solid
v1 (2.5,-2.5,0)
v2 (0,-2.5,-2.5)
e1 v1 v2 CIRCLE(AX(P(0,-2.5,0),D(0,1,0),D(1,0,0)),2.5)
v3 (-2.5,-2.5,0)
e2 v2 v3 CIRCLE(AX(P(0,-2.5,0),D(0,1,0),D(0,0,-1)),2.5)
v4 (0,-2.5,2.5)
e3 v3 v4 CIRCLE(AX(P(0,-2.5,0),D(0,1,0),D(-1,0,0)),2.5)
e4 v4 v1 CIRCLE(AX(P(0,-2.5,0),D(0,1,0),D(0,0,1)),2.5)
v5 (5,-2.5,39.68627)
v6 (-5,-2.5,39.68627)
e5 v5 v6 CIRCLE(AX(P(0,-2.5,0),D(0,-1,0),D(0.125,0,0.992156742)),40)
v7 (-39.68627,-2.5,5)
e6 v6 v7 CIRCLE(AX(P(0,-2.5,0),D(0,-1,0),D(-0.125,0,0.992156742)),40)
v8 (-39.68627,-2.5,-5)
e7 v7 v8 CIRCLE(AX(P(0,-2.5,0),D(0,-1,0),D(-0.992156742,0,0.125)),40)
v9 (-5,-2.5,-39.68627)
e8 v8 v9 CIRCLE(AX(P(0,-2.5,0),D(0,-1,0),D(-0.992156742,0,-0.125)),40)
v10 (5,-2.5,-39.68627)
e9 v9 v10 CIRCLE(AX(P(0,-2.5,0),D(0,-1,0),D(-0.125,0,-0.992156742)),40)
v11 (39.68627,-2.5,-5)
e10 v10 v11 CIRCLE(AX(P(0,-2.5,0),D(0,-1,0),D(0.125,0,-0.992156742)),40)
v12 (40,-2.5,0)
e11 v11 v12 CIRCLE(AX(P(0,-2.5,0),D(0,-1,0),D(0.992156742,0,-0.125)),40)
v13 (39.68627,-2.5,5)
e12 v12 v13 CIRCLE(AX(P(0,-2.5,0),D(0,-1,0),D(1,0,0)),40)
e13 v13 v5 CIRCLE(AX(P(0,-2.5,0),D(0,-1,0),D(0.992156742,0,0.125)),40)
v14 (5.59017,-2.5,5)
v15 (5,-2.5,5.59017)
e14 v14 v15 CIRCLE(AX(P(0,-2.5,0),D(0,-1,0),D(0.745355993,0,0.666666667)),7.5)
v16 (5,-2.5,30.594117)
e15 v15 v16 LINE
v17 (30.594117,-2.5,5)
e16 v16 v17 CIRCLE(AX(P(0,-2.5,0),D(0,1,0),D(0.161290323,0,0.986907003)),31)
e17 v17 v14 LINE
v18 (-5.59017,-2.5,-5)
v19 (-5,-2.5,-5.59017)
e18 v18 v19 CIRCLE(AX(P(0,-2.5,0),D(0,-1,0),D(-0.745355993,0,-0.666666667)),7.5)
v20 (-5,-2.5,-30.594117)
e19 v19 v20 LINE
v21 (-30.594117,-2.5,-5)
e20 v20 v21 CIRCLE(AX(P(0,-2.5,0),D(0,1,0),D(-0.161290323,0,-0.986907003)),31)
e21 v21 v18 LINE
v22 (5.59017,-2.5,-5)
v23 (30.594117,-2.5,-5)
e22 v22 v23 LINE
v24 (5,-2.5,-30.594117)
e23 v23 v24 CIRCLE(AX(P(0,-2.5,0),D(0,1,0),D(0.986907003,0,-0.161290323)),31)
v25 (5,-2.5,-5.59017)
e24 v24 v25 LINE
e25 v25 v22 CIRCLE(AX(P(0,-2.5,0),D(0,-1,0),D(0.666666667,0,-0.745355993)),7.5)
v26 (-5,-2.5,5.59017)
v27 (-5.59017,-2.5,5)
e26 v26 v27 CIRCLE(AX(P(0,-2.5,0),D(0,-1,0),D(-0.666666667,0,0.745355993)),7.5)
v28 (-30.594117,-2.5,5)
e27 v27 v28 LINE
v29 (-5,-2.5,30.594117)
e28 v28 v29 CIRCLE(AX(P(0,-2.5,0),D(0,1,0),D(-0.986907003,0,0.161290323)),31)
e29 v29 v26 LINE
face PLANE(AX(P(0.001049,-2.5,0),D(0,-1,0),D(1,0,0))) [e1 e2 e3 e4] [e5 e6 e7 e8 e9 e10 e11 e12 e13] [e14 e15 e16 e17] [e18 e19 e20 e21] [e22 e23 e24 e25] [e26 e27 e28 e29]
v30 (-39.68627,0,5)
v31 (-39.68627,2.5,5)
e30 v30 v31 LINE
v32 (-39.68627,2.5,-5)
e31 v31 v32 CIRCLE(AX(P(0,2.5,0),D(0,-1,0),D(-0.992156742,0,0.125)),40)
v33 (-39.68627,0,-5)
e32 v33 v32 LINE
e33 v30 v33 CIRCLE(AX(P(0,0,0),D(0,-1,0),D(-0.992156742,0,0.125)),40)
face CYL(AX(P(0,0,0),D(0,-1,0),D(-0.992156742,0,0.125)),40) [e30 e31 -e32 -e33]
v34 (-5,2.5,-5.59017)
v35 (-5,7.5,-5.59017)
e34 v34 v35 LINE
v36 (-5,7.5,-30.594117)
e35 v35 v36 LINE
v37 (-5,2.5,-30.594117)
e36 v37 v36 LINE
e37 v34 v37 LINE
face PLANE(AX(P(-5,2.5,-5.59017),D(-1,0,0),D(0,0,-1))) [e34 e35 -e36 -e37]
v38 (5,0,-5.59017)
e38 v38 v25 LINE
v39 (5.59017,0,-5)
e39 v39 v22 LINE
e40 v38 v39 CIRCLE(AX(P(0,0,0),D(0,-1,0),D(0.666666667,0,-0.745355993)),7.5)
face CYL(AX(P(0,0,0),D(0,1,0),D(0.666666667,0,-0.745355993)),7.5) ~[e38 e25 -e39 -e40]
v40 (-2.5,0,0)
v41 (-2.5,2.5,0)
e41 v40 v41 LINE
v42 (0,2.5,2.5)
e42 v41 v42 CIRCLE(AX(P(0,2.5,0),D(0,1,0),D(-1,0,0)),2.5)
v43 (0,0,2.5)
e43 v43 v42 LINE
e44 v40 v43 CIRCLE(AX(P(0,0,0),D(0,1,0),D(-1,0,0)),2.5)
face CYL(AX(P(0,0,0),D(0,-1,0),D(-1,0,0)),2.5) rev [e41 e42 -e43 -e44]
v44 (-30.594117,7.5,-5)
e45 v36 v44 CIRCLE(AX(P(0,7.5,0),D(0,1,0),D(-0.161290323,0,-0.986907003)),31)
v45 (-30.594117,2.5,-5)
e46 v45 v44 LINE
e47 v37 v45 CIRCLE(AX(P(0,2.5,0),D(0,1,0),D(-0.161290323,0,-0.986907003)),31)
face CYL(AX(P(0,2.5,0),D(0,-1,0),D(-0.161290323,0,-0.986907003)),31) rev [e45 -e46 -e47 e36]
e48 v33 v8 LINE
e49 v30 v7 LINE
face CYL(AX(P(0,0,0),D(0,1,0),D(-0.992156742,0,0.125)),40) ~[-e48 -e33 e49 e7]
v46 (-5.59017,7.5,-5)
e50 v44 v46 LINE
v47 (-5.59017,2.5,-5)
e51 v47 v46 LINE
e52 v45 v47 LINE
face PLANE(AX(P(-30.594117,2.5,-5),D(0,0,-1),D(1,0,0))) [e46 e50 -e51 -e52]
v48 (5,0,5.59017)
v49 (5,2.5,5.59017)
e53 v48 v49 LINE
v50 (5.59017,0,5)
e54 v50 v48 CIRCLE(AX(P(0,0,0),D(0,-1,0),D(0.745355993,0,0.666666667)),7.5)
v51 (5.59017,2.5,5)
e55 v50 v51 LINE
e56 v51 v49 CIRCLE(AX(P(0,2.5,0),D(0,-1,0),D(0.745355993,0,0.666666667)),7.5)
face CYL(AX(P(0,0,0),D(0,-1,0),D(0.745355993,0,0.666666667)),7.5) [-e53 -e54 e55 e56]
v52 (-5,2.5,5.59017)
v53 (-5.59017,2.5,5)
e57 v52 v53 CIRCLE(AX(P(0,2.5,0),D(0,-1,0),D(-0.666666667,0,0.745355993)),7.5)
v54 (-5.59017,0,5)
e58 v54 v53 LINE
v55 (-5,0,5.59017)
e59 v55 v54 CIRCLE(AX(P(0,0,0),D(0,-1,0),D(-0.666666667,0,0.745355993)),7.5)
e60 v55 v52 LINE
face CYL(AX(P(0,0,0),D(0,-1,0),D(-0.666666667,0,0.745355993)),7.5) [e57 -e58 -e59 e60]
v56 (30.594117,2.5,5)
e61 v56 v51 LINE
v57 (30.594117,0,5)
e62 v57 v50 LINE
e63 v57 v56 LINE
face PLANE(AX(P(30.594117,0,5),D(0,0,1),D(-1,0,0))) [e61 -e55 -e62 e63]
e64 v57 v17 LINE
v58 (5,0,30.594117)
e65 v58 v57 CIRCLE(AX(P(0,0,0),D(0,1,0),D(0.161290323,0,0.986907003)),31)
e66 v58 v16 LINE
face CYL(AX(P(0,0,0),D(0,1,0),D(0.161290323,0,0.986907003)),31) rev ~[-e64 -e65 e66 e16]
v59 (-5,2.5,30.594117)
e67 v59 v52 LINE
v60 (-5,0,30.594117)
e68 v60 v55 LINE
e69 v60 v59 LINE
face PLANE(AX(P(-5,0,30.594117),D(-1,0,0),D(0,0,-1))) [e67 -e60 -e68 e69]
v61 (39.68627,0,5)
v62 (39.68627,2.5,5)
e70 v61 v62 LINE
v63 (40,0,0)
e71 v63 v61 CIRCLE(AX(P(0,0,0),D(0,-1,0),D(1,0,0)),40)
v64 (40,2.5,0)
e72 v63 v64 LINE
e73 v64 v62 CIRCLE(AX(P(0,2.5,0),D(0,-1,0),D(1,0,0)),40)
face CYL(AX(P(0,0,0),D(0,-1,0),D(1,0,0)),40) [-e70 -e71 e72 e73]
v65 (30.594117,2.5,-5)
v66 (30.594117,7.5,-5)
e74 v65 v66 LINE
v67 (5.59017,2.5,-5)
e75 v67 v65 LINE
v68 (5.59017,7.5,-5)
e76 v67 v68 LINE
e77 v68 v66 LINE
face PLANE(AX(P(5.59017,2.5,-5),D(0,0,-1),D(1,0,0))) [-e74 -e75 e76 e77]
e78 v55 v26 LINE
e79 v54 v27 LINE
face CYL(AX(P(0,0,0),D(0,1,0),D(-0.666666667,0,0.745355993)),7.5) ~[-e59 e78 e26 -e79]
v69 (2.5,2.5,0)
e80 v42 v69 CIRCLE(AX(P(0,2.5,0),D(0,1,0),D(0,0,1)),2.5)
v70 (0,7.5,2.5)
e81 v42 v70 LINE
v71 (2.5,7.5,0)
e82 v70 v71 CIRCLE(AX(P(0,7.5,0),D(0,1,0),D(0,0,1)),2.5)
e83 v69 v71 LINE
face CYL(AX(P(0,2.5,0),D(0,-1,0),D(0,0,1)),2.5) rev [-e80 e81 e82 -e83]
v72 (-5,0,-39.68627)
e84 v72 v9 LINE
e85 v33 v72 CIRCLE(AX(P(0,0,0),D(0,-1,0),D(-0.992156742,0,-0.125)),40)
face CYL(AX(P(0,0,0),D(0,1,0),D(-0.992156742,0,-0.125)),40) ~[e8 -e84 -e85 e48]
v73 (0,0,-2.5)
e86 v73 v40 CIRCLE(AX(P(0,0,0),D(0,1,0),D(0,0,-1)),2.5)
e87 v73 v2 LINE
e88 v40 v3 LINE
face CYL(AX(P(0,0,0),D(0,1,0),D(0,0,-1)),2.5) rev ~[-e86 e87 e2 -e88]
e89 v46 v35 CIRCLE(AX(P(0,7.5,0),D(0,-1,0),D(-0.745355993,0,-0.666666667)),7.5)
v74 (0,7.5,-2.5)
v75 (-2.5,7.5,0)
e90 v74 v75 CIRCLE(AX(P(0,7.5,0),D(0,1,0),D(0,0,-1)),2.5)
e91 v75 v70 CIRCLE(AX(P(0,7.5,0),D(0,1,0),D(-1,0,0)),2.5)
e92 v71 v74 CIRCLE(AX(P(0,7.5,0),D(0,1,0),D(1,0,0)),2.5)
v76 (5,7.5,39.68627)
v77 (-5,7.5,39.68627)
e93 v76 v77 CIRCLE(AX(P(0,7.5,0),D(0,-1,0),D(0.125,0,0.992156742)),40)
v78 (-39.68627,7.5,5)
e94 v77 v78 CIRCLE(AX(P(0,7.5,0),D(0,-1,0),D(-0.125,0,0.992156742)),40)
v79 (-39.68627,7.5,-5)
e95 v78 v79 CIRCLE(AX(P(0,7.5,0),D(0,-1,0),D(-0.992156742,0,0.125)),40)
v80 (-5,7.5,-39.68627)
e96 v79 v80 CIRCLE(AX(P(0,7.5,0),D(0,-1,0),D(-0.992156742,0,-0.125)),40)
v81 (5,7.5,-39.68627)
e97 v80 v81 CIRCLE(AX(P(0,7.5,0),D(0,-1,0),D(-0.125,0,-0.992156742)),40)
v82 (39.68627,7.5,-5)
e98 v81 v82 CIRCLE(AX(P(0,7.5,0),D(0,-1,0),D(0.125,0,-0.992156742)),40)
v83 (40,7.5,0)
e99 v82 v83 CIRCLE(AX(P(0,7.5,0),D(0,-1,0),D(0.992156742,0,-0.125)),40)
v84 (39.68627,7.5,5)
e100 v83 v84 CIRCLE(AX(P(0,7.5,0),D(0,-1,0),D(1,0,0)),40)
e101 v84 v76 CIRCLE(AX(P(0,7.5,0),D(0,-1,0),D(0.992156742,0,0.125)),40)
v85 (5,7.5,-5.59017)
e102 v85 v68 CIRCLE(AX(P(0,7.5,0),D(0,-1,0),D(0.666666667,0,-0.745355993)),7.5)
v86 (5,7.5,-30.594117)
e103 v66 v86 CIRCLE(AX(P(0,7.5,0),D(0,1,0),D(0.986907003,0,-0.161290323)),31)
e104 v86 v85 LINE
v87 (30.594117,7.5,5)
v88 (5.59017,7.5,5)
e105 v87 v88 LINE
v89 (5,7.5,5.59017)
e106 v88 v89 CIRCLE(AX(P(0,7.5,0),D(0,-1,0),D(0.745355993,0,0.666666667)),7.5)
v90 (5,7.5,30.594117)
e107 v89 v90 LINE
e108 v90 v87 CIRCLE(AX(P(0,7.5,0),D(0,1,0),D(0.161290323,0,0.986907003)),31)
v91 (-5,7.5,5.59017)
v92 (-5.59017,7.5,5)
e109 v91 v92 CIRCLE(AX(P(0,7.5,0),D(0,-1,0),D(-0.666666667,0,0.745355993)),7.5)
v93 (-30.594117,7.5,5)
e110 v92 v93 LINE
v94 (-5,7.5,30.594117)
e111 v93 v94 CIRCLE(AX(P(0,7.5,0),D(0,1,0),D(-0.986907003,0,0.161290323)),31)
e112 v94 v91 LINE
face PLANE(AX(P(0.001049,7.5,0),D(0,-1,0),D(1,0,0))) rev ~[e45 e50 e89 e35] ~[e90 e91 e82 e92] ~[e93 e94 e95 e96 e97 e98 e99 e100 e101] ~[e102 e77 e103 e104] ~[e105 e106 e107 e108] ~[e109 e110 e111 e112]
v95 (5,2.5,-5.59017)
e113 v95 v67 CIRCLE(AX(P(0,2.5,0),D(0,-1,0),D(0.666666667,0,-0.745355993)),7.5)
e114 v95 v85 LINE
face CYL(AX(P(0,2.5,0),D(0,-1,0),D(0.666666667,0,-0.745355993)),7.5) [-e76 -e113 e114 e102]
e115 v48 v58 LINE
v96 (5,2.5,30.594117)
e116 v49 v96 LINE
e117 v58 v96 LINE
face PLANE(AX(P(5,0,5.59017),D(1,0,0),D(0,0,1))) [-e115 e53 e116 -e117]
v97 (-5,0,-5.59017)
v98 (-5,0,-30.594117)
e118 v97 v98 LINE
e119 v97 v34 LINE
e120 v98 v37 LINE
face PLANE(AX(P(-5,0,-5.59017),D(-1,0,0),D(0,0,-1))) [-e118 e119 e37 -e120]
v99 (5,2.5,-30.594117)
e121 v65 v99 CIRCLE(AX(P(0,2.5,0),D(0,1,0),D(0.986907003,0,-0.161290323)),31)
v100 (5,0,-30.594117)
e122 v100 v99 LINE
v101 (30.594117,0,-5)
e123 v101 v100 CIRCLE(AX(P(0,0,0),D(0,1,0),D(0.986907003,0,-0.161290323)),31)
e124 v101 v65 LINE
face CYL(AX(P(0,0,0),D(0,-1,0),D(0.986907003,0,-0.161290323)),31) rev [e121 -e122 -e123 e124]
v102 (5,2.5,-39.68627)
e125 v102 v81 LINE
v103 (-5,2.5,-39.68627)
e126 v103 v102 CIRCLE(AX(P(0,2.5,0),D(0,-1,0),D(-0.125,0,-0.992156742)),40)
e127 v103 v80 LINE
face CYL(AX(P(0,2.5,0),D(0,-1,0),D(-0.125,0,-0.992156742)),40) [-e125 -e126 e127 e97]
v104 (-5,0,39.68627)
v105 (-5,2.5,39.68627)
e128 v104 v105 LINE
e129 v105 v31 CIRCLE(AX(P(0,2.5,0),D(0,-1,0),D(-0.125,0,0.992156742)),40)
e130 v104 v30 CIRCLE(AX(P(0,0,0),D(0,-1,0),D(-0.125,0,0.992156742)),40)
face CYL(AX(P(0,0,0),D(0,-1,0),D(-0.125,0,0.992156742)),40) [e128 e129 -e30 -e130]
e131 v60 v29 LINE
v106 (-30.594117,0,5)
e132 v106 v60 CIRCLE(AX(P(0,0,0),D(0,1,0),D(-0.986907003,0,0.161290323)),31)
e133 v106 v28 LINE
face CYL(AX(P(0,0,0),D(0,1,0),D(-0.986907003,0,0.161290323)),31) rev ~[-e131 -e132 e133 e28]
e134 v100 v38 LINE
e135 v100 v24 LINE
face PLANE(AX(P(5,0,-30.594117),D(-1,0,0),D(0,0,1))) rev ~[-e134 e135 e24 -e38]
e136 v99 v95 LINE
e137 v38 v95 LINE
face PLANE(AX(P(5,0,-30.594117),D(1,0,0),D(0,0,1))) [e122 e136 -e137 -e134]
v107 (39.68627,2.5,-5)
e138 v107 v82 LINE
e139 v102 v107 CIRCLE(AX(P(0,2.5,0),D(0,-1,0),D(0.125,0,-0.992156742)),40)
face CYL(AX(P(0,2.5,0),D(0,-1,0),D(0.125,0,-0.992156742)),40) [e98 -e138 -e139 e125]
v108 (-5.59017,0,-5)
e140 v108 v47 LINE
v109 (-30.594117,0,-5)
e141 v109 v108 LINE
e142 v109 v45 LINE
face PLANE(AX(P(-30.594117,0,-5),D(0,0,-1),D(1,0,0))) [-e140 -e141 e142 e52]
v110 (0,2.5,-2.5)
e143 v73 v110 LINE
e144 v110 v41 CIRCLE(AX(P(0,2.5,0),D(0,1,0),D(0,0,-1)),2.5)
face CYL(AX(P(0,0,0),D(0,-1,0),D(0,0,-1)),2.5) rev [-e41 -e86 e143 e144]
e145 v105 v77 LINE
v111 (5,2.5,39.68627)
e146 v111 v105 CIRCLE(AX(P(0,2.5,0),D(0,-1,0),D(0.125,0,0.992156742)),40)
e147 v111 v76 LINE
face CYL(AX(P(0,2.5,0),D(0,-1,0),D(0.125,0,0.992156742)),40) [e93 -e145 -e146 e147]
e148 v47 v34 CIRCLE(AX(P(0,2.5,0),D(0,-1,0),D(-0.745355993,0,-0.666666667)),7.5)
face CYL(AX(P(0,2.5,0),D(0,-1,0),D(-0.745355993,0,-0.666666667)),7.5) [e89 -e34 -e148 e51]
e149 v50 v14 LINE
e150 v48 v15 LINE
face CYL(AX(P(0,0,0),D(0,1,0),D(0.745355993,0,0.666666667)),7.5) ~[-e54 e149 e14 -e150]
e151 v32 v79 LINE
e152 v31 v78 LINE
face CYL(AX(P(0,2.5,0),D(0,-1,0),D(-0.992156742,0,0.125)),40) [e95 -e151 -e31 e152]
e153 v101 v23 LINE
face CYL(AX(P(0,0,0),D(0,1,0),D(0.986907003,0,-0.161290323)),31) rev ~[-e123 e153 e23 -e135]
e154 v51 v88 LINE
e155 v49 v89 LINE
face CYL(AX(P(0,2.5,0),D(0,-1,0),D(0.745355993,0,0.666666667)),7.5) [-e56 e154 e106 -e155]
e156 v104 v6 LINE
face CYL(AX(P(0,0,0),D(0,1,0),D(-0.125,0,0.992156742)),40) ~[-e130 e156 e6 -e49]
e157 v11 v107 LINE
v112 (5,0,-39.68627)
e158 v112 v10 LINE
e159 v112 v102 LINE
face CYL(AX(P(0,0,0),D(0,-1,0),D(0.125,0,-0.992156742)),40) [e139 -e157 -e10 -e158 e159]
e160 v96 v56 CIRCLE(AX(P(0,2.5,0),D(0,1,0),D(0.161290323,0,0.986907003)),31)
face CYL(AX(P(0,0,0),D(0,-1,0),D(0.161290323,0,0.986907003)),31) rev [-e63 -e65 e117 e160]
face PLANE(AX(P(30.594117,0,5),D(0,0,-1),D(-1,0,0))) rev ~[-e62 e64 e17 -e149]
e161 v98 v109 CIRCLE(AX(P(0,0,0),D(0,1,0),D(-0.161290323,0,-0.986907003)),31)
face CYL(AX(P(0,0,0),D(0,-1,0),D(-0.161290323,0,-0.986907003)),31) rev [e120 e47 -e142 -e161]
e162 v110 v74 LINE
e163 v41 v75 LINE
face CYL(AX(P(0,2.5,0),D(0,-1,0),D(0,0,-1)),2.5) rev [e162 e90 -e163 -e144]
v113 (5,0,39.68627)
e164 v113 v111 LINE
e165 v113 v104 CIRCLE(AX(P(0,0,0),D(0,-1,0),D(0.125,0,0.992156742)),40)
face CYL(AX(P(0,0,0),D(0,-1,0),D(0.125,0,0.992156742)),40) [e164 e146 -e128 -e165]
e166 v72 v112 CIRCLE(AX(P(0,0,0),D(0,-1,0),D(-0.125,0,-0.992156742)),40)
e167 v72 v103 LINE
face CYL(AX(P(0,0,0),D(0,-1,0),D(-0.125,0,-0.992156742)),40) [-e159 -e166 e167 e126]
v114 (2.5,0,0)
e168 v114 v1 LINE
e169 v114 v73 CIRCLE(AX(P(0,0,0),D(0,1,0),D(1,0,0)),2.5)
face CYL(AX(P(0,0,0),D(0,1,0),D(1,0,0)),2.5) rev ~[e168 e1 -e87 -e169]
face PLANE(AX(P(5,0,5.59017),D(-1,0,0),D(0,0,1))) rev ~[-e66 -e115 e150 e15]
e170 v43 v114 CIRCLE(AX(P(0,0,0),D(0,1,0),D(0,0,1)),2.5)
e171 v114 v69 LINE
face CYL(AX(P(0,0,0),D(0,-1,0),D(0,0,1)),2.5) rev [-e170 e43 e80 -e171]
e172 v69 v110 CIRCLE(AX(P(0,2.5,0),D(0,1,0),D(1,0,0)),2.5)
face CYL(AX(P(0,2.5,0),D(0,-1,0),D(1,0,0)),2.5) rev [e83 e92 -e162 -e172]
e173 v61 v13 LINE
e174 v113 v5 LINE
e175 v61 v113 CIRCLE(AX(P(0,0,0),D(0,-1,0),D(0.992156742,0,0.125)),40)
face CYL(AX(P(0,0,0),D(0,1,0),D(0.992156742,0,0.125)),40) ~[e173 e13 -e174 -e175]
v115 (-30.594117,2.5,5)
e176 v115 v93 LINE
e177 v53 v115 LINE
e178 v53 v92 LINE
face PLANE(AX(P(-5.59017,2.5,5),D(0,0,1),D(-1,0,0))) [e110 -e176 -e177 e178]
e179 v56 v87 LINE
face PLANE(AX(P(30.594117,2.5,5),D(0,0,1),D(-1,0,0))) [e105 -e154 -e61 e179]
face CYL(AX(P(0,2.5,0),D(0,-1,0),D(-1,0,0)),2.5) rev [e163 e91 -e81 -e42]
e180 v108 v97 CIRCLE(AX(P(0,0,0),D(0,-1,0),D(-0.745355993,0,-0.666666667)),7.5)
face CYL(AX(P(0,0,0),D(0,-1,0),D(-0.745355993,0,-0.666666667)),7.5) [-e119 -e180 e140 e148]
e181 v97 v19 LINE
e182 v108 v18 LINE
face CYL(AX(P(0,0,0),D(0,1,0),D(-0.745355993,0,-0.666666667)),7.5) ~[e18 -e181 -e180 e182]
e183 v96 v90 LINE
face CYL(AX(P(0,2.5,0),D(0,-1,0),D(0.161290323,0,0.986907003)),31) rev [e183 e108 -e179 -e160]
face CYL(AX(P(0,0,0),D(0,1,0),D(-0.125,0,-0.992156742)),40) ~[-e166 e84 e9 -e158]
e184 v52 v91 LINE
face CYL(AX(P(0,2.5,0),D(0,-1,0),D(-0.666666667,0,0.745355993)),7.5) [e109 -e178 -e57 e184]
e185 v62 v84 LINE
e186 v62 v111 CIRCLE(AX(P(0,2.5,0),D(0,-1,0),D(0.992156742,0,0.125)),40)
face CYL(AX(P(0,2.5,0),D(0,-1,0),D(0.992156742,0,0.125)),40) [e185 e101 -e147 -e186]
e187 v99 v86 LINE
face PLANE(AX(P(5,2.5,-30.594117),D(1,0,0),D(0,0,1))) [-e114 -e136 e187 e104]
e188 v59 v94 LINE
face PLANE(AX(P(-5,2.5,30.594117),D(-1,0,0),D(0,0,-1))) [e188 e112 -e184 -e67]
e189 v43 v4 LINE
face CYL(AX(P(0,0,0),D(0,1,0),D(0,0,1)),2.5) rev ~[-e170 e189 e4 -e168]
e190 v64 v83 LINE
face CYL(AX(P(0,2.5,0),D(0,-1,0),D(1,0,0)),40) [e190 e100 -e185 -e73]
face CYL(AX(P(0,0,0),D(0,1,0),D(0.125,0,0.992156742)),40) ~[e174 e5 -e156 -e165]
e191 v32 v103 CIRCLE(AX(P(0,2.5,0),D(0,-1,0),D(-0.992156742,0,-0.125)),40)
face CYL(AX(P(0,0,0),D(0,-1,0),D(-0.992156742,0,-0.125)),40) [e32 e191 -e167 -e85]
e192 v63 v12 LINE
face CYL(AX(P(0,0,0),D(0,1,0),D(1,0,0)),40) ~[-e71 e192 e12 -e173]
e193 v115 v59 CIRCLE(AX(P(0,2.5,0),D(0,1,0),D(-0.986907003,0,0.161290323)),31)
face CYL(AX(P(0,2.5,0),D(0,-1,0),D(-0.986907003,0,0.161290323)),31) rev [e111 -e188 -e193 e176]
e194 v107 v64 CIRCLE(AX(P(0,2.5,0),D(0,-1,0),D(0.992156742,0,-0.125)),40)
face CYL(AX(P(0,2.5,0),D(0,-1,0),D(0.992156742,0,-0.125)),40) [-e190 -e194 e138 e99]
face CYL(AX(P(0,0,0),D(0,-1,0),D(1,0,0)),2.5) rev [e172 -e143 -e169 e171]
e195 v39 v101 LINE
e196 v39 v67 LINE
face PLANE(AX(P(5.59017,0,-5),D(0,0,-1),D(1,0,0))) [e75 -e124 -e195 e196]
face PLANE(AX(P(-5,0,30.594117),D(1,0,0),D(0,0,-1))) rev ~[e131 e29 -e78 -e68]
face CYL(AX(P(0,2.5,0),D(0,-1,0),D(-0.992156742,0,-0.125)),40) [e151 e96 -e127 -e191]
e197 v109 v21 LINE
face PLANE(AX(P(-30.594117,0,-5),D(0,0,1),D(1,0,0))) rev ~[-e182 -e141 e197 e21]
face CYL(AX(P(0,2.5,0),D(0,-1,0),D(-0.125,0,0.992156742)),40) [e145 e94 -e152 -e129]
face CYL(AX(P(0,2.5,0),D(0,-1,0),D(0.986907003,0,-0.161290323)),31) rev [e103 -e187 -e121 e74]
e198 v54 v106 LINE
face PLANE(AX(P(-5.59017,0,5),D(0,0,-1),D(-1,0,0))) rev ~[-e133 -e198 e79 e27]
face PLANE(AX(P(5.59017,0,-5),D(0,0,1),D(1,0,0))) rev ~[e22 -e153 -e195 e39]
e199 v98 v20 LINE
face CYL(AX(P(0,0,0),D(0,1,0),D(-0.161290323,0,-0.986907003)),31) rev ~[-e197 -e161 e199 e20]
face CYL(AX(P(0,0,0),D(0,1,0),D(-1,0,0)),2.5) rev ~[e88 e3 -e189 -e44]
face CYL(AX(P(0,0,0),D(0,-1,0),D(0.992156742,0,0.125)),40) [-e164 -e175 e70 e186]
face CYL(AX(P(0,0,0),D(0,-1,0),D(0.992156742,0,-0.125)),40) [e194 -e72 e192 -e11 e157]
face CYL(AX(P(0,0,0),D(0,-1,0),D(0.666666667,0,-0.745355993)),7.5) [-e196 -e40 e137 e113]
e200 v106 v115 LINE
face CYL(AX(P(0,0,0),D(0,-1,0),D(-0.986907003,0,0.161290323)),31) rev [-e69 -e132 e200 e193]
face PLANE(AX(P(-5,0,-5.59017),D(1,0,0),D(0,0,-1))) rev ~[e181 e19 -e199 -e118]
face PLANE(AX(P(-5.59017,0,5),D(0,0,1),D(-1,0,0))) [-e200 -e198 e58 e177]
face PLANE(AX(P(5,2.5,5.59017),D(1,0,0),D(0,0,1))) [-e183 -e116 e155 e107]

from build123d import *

# Parameters (mm, degrees)
F1_DEPTH = 2.5
F2_DEPTH = 5


# Not quite as in the source:
# - a feature names something its author has since deleted; it is built from what else it names


with BuildPart() as f1:
    # F0 (on Front) → F1 (new body, symmetric)
    with BuildSketch(Plane.XZ):
        with BuildLine():
            ThreePointArc((39.686269666, -5), (39.9214903695, -2.5049165017), (40, 0))
            ThreePointArc((40, 0), (39.9214903695, 2.5049165017), (39.686269666, 5))
            ThreePointArc((39.686269666, 5), (28.2842712475, 28.2842712475), (5, 39.686269666))
            ThreePointArc((5, 39.686269666), (0, 40), (-5, 39.686269666))
            ThreePointArc((-5, 39.686269666), (-28.2842712475, 28.2842712475), (-39.686269666, 5))
            ThreePointArc((-39.686269666, 5), (-40, 0), (-39.686269666, -5))
            ThreePointArc((-39.686269666, -5), (-28.2842712475, -28.2842712475), (-5, -39.686269666))
            ThreePointArc((-5, -39.686269666), (0, -40), (5, -39.686269666))
            ThreePointArc((5, -39.686269666), (28.2842712475, -28.2842712475), (39.686269666, -5))
        make_face()
        with BuildLine():
            ThreePointArc((30.5941170816, 5), (30.8983626551, 2.5082235219), (31, 0))
            ThreePointArc((31, 0), (30.8983626551, -2.5082235219), (30.5941170816, -5))
            ThreePointArc((30.5941170816, -5), (21.9203102168, -21.9203102168), (5, -30.5941170816))
            ThreePointArc((5, -30.5941170816), (2.5082235219, -30.8983626551), (0, -31))
            ThreePointArc((0, -31), (-2.5082235219, -30.8983626551), (-5, -30.5941170816))
            ThreePointArc((-5, -30.5941170816), (-21.9203102168, -21.9203102168), (-30.5941170816, -5))
            ThreePointArc((-30.5941170816, -5), (-30.8983626551, -2.5082235219), (-31, 0))
            ThreePointArc((-31, 0), (-30.8983626551, 2.5082235219), (-30.5941170816, 5))
            ThreePointArc((-30.5941170816, 5), (-21.9203102168, 21.9203102168), (-5, 30.5941170816))
            ThreePointArc((-5, 30.5941170816), (-2.5082235219, 30.8983626551), (0, 31))
            ThreePointArc((0, 31), (2.5082235219, 30.8983626551), (5, 30.5941170816))
            ThreePointArc((5, 30.5941170816), (21.9203102168, 21.9203102168), (30.5941170816, 5))
        make_face(mode=Mode.SUBTRACT)
        with BuildLine():
            Line((7.5, 0), (31, 0))
            ThreePointArc((31, 0), (30.8983626551, 2.5082235219), (30.5941170816, 5))
            Line((30.5941170816, 5), (5.5901699437, 5))
            ThreePointArc((5.5901699437, 5), (7.0062926922, 2.6761656733), (7.5, 0))
        make_face()
        with BuildLine():
            ThreePointArc((30.5941170816, -5), (30.8983626551, -2.5082235219), (31, 0))
            Line((31, 0), (7.5, 0))
            ThreePointArc((7.5, 0), (7.0062926922, -2.6761656733), (5.5901699437, -5))
            Line((5.5901699437, -5), (30.5941170816, -5))
        make_face()
        with BuildLine():
            Line((2.5, 0), (7.5, 0))
            ThreePointArc((7.5, 0), (7.0062926922, 2.6761656733), (5.5901699437, 5))
            ThreePointArc((5.5901699437, 5), (5.3033008589, 5.3033008589), (5, 5.5901699437))
            ThreePointArc((5, 5.5901699437), (2.6761656733, 7.0062926922), (0, 7.5))
            Line((0, 7.5), (0, 2.5))
            ThreePointArc((0, 2.5), (1.767766953, 1.767766953), (2.5, 0))
        make_face()
        with BuildLine():
            ThreePointArc((5.5901699437, -5), (7.0062926922, -2.6761656733), (7.5, 0))
            Line((7.5, 0), (2.5, 0))
            ThreePointArc((2.5, 0), (1.767766953, -1.767766953), (0, -2.5))
            Line((0, -2.5), (0, -7.5))
            ThreePointArc((0, -7.5), (2.6761656733, -7.0062926922), (5, -5.5901699437))
            ThreePointArc((5, -5.5901699437), (5.3033008589, -5.3033008589), (5.5901699437, -5))
        make_face()
        with BuildLine():
            Line((5, 5.5901699437), (5, 30.5941170816))
            ThreePointArc((5, 30.5941170816), (2.5082235219, 30.8983626551), (0, 31))
            Line((0, 31), (0, 7.5))
            ThreePointArc((0, 7.5), (2.6761656733, 7.0062926922), (5, 5.5901699437))
        make_face()
        with BuildLine():
            ThreePointArc((0, -31), (2.5082235219, -30.8983626551), (5, -30.5941170816))
            Line((5, -30.5941170816), (5, -5.5901699437))
            ThreePointArc((5, -5.5901699437), (2.6761656733, -7.0062926922), (0, -7.5))
            Line((0, -7.5), (0, -31))
        make_face()
        with BuildLine():
            Line((0, 7.5), (0, 31))
            ThreePointArc((0, 31), (-2.5082235219, 30.8983626551), (-5, 30.5941170816))
            Line((-5, 30.5941170816), (-5, 5.5901699437))
            ThreePointArc((-5, 5.5901699437), (-2.6761656733, 7.0062926922), (0, 7.5))
        make_face()
        with BuildLine():
            ThreePointArc((-5, -30.5941170816), (-2.5082235219, -30.8983626551), (0, -31))
            Line((0, -31), (0, -7.5))
            ThreePointArc((0, -7.5), (-2.6761656733, -7.0062926922), (-5, -5.5901699437))
            Line((-5, -5.5901699437), (-5, -30.5941170816))
        make_face()
        with BuildLine():
            ThreePointArc((-2.5, 0), (-1.767766953, 1.767766953), (0, 2.5))
            Line((0, 2.5), (0, 7.5))
            ThreePointArc((0, 7.5), (-2.6761656733, 7.0062926922), (-5, 5.5901699437))
            ThreePointArc((-5, 5.5901699437), (-5.3033008589, 5.3033008589), (-5.5901699437, 5))
            ThreePointArc((-5.5901699437, 5), (-7.0062926922, 2.6761656733), (-7.5, 0))
            Line((-7.5, 0), (-2.5, 0))
        make_face()
        with BuildLine():
            Line((0, -7.5), (0, -2.5))
            ThreePointArc((0, -2.5), (-1.767766953, -1.767766953), (-2.5, 0))
            Line((-2.5, 0), (-7.5, 0))
            ThreePointArc((-7.5, 0), (-7.0062926922, -2.6761656733), (-5.5901699437, -5))
            ThreePointArc((-5.5901699437, -5), (-5.3033008589, -5.3033008589), (-5, -5.5901699437))
            ThreePointArc((-5, -5.5901699437), (-2.6761656733, -7.0062926922), (0, -7.5))
        make_face()
        with BuildLine():
            Line((-5.5901699437, 5), (-30.5941170816, 5))
            ThreePointArc((-30.5941170816, 5), (-30.8983626551, 2.5082235219), (-31, 0))
            Line((-31, 0), (-7.5, 0))
            ThreePointArc((-7.5, 0), (-7.0062926922, 2.6761656733), (-5.5901699437, 5))
        make_face()
        with BuildLine():
            ThreePointArc((-31, 0), (-30.8983626551, -2.5082235219), (-30.5941170816, -5))
            Line((-30.5941170816, -5), (-5.5901699437, -5))
            ThreePointArc((-5.5901699437, -5), (-7.0062926922, -2.6761656733), (-7.5, 0))
            Line((-7.5, 0), (-31, 0))
        make_face()
    extrude(amount=F1_DEPTH, both=True)

    # F2 (add): a face of the model
    f2_faces = [f1.faces().sort_by_distance(p)[0] for p in [
        (-38.5637724499, 2.5, 4.8585786438),
    ]]
    extrude(f2_faces, amount=F2_DEPTH)


solid = f1.part
